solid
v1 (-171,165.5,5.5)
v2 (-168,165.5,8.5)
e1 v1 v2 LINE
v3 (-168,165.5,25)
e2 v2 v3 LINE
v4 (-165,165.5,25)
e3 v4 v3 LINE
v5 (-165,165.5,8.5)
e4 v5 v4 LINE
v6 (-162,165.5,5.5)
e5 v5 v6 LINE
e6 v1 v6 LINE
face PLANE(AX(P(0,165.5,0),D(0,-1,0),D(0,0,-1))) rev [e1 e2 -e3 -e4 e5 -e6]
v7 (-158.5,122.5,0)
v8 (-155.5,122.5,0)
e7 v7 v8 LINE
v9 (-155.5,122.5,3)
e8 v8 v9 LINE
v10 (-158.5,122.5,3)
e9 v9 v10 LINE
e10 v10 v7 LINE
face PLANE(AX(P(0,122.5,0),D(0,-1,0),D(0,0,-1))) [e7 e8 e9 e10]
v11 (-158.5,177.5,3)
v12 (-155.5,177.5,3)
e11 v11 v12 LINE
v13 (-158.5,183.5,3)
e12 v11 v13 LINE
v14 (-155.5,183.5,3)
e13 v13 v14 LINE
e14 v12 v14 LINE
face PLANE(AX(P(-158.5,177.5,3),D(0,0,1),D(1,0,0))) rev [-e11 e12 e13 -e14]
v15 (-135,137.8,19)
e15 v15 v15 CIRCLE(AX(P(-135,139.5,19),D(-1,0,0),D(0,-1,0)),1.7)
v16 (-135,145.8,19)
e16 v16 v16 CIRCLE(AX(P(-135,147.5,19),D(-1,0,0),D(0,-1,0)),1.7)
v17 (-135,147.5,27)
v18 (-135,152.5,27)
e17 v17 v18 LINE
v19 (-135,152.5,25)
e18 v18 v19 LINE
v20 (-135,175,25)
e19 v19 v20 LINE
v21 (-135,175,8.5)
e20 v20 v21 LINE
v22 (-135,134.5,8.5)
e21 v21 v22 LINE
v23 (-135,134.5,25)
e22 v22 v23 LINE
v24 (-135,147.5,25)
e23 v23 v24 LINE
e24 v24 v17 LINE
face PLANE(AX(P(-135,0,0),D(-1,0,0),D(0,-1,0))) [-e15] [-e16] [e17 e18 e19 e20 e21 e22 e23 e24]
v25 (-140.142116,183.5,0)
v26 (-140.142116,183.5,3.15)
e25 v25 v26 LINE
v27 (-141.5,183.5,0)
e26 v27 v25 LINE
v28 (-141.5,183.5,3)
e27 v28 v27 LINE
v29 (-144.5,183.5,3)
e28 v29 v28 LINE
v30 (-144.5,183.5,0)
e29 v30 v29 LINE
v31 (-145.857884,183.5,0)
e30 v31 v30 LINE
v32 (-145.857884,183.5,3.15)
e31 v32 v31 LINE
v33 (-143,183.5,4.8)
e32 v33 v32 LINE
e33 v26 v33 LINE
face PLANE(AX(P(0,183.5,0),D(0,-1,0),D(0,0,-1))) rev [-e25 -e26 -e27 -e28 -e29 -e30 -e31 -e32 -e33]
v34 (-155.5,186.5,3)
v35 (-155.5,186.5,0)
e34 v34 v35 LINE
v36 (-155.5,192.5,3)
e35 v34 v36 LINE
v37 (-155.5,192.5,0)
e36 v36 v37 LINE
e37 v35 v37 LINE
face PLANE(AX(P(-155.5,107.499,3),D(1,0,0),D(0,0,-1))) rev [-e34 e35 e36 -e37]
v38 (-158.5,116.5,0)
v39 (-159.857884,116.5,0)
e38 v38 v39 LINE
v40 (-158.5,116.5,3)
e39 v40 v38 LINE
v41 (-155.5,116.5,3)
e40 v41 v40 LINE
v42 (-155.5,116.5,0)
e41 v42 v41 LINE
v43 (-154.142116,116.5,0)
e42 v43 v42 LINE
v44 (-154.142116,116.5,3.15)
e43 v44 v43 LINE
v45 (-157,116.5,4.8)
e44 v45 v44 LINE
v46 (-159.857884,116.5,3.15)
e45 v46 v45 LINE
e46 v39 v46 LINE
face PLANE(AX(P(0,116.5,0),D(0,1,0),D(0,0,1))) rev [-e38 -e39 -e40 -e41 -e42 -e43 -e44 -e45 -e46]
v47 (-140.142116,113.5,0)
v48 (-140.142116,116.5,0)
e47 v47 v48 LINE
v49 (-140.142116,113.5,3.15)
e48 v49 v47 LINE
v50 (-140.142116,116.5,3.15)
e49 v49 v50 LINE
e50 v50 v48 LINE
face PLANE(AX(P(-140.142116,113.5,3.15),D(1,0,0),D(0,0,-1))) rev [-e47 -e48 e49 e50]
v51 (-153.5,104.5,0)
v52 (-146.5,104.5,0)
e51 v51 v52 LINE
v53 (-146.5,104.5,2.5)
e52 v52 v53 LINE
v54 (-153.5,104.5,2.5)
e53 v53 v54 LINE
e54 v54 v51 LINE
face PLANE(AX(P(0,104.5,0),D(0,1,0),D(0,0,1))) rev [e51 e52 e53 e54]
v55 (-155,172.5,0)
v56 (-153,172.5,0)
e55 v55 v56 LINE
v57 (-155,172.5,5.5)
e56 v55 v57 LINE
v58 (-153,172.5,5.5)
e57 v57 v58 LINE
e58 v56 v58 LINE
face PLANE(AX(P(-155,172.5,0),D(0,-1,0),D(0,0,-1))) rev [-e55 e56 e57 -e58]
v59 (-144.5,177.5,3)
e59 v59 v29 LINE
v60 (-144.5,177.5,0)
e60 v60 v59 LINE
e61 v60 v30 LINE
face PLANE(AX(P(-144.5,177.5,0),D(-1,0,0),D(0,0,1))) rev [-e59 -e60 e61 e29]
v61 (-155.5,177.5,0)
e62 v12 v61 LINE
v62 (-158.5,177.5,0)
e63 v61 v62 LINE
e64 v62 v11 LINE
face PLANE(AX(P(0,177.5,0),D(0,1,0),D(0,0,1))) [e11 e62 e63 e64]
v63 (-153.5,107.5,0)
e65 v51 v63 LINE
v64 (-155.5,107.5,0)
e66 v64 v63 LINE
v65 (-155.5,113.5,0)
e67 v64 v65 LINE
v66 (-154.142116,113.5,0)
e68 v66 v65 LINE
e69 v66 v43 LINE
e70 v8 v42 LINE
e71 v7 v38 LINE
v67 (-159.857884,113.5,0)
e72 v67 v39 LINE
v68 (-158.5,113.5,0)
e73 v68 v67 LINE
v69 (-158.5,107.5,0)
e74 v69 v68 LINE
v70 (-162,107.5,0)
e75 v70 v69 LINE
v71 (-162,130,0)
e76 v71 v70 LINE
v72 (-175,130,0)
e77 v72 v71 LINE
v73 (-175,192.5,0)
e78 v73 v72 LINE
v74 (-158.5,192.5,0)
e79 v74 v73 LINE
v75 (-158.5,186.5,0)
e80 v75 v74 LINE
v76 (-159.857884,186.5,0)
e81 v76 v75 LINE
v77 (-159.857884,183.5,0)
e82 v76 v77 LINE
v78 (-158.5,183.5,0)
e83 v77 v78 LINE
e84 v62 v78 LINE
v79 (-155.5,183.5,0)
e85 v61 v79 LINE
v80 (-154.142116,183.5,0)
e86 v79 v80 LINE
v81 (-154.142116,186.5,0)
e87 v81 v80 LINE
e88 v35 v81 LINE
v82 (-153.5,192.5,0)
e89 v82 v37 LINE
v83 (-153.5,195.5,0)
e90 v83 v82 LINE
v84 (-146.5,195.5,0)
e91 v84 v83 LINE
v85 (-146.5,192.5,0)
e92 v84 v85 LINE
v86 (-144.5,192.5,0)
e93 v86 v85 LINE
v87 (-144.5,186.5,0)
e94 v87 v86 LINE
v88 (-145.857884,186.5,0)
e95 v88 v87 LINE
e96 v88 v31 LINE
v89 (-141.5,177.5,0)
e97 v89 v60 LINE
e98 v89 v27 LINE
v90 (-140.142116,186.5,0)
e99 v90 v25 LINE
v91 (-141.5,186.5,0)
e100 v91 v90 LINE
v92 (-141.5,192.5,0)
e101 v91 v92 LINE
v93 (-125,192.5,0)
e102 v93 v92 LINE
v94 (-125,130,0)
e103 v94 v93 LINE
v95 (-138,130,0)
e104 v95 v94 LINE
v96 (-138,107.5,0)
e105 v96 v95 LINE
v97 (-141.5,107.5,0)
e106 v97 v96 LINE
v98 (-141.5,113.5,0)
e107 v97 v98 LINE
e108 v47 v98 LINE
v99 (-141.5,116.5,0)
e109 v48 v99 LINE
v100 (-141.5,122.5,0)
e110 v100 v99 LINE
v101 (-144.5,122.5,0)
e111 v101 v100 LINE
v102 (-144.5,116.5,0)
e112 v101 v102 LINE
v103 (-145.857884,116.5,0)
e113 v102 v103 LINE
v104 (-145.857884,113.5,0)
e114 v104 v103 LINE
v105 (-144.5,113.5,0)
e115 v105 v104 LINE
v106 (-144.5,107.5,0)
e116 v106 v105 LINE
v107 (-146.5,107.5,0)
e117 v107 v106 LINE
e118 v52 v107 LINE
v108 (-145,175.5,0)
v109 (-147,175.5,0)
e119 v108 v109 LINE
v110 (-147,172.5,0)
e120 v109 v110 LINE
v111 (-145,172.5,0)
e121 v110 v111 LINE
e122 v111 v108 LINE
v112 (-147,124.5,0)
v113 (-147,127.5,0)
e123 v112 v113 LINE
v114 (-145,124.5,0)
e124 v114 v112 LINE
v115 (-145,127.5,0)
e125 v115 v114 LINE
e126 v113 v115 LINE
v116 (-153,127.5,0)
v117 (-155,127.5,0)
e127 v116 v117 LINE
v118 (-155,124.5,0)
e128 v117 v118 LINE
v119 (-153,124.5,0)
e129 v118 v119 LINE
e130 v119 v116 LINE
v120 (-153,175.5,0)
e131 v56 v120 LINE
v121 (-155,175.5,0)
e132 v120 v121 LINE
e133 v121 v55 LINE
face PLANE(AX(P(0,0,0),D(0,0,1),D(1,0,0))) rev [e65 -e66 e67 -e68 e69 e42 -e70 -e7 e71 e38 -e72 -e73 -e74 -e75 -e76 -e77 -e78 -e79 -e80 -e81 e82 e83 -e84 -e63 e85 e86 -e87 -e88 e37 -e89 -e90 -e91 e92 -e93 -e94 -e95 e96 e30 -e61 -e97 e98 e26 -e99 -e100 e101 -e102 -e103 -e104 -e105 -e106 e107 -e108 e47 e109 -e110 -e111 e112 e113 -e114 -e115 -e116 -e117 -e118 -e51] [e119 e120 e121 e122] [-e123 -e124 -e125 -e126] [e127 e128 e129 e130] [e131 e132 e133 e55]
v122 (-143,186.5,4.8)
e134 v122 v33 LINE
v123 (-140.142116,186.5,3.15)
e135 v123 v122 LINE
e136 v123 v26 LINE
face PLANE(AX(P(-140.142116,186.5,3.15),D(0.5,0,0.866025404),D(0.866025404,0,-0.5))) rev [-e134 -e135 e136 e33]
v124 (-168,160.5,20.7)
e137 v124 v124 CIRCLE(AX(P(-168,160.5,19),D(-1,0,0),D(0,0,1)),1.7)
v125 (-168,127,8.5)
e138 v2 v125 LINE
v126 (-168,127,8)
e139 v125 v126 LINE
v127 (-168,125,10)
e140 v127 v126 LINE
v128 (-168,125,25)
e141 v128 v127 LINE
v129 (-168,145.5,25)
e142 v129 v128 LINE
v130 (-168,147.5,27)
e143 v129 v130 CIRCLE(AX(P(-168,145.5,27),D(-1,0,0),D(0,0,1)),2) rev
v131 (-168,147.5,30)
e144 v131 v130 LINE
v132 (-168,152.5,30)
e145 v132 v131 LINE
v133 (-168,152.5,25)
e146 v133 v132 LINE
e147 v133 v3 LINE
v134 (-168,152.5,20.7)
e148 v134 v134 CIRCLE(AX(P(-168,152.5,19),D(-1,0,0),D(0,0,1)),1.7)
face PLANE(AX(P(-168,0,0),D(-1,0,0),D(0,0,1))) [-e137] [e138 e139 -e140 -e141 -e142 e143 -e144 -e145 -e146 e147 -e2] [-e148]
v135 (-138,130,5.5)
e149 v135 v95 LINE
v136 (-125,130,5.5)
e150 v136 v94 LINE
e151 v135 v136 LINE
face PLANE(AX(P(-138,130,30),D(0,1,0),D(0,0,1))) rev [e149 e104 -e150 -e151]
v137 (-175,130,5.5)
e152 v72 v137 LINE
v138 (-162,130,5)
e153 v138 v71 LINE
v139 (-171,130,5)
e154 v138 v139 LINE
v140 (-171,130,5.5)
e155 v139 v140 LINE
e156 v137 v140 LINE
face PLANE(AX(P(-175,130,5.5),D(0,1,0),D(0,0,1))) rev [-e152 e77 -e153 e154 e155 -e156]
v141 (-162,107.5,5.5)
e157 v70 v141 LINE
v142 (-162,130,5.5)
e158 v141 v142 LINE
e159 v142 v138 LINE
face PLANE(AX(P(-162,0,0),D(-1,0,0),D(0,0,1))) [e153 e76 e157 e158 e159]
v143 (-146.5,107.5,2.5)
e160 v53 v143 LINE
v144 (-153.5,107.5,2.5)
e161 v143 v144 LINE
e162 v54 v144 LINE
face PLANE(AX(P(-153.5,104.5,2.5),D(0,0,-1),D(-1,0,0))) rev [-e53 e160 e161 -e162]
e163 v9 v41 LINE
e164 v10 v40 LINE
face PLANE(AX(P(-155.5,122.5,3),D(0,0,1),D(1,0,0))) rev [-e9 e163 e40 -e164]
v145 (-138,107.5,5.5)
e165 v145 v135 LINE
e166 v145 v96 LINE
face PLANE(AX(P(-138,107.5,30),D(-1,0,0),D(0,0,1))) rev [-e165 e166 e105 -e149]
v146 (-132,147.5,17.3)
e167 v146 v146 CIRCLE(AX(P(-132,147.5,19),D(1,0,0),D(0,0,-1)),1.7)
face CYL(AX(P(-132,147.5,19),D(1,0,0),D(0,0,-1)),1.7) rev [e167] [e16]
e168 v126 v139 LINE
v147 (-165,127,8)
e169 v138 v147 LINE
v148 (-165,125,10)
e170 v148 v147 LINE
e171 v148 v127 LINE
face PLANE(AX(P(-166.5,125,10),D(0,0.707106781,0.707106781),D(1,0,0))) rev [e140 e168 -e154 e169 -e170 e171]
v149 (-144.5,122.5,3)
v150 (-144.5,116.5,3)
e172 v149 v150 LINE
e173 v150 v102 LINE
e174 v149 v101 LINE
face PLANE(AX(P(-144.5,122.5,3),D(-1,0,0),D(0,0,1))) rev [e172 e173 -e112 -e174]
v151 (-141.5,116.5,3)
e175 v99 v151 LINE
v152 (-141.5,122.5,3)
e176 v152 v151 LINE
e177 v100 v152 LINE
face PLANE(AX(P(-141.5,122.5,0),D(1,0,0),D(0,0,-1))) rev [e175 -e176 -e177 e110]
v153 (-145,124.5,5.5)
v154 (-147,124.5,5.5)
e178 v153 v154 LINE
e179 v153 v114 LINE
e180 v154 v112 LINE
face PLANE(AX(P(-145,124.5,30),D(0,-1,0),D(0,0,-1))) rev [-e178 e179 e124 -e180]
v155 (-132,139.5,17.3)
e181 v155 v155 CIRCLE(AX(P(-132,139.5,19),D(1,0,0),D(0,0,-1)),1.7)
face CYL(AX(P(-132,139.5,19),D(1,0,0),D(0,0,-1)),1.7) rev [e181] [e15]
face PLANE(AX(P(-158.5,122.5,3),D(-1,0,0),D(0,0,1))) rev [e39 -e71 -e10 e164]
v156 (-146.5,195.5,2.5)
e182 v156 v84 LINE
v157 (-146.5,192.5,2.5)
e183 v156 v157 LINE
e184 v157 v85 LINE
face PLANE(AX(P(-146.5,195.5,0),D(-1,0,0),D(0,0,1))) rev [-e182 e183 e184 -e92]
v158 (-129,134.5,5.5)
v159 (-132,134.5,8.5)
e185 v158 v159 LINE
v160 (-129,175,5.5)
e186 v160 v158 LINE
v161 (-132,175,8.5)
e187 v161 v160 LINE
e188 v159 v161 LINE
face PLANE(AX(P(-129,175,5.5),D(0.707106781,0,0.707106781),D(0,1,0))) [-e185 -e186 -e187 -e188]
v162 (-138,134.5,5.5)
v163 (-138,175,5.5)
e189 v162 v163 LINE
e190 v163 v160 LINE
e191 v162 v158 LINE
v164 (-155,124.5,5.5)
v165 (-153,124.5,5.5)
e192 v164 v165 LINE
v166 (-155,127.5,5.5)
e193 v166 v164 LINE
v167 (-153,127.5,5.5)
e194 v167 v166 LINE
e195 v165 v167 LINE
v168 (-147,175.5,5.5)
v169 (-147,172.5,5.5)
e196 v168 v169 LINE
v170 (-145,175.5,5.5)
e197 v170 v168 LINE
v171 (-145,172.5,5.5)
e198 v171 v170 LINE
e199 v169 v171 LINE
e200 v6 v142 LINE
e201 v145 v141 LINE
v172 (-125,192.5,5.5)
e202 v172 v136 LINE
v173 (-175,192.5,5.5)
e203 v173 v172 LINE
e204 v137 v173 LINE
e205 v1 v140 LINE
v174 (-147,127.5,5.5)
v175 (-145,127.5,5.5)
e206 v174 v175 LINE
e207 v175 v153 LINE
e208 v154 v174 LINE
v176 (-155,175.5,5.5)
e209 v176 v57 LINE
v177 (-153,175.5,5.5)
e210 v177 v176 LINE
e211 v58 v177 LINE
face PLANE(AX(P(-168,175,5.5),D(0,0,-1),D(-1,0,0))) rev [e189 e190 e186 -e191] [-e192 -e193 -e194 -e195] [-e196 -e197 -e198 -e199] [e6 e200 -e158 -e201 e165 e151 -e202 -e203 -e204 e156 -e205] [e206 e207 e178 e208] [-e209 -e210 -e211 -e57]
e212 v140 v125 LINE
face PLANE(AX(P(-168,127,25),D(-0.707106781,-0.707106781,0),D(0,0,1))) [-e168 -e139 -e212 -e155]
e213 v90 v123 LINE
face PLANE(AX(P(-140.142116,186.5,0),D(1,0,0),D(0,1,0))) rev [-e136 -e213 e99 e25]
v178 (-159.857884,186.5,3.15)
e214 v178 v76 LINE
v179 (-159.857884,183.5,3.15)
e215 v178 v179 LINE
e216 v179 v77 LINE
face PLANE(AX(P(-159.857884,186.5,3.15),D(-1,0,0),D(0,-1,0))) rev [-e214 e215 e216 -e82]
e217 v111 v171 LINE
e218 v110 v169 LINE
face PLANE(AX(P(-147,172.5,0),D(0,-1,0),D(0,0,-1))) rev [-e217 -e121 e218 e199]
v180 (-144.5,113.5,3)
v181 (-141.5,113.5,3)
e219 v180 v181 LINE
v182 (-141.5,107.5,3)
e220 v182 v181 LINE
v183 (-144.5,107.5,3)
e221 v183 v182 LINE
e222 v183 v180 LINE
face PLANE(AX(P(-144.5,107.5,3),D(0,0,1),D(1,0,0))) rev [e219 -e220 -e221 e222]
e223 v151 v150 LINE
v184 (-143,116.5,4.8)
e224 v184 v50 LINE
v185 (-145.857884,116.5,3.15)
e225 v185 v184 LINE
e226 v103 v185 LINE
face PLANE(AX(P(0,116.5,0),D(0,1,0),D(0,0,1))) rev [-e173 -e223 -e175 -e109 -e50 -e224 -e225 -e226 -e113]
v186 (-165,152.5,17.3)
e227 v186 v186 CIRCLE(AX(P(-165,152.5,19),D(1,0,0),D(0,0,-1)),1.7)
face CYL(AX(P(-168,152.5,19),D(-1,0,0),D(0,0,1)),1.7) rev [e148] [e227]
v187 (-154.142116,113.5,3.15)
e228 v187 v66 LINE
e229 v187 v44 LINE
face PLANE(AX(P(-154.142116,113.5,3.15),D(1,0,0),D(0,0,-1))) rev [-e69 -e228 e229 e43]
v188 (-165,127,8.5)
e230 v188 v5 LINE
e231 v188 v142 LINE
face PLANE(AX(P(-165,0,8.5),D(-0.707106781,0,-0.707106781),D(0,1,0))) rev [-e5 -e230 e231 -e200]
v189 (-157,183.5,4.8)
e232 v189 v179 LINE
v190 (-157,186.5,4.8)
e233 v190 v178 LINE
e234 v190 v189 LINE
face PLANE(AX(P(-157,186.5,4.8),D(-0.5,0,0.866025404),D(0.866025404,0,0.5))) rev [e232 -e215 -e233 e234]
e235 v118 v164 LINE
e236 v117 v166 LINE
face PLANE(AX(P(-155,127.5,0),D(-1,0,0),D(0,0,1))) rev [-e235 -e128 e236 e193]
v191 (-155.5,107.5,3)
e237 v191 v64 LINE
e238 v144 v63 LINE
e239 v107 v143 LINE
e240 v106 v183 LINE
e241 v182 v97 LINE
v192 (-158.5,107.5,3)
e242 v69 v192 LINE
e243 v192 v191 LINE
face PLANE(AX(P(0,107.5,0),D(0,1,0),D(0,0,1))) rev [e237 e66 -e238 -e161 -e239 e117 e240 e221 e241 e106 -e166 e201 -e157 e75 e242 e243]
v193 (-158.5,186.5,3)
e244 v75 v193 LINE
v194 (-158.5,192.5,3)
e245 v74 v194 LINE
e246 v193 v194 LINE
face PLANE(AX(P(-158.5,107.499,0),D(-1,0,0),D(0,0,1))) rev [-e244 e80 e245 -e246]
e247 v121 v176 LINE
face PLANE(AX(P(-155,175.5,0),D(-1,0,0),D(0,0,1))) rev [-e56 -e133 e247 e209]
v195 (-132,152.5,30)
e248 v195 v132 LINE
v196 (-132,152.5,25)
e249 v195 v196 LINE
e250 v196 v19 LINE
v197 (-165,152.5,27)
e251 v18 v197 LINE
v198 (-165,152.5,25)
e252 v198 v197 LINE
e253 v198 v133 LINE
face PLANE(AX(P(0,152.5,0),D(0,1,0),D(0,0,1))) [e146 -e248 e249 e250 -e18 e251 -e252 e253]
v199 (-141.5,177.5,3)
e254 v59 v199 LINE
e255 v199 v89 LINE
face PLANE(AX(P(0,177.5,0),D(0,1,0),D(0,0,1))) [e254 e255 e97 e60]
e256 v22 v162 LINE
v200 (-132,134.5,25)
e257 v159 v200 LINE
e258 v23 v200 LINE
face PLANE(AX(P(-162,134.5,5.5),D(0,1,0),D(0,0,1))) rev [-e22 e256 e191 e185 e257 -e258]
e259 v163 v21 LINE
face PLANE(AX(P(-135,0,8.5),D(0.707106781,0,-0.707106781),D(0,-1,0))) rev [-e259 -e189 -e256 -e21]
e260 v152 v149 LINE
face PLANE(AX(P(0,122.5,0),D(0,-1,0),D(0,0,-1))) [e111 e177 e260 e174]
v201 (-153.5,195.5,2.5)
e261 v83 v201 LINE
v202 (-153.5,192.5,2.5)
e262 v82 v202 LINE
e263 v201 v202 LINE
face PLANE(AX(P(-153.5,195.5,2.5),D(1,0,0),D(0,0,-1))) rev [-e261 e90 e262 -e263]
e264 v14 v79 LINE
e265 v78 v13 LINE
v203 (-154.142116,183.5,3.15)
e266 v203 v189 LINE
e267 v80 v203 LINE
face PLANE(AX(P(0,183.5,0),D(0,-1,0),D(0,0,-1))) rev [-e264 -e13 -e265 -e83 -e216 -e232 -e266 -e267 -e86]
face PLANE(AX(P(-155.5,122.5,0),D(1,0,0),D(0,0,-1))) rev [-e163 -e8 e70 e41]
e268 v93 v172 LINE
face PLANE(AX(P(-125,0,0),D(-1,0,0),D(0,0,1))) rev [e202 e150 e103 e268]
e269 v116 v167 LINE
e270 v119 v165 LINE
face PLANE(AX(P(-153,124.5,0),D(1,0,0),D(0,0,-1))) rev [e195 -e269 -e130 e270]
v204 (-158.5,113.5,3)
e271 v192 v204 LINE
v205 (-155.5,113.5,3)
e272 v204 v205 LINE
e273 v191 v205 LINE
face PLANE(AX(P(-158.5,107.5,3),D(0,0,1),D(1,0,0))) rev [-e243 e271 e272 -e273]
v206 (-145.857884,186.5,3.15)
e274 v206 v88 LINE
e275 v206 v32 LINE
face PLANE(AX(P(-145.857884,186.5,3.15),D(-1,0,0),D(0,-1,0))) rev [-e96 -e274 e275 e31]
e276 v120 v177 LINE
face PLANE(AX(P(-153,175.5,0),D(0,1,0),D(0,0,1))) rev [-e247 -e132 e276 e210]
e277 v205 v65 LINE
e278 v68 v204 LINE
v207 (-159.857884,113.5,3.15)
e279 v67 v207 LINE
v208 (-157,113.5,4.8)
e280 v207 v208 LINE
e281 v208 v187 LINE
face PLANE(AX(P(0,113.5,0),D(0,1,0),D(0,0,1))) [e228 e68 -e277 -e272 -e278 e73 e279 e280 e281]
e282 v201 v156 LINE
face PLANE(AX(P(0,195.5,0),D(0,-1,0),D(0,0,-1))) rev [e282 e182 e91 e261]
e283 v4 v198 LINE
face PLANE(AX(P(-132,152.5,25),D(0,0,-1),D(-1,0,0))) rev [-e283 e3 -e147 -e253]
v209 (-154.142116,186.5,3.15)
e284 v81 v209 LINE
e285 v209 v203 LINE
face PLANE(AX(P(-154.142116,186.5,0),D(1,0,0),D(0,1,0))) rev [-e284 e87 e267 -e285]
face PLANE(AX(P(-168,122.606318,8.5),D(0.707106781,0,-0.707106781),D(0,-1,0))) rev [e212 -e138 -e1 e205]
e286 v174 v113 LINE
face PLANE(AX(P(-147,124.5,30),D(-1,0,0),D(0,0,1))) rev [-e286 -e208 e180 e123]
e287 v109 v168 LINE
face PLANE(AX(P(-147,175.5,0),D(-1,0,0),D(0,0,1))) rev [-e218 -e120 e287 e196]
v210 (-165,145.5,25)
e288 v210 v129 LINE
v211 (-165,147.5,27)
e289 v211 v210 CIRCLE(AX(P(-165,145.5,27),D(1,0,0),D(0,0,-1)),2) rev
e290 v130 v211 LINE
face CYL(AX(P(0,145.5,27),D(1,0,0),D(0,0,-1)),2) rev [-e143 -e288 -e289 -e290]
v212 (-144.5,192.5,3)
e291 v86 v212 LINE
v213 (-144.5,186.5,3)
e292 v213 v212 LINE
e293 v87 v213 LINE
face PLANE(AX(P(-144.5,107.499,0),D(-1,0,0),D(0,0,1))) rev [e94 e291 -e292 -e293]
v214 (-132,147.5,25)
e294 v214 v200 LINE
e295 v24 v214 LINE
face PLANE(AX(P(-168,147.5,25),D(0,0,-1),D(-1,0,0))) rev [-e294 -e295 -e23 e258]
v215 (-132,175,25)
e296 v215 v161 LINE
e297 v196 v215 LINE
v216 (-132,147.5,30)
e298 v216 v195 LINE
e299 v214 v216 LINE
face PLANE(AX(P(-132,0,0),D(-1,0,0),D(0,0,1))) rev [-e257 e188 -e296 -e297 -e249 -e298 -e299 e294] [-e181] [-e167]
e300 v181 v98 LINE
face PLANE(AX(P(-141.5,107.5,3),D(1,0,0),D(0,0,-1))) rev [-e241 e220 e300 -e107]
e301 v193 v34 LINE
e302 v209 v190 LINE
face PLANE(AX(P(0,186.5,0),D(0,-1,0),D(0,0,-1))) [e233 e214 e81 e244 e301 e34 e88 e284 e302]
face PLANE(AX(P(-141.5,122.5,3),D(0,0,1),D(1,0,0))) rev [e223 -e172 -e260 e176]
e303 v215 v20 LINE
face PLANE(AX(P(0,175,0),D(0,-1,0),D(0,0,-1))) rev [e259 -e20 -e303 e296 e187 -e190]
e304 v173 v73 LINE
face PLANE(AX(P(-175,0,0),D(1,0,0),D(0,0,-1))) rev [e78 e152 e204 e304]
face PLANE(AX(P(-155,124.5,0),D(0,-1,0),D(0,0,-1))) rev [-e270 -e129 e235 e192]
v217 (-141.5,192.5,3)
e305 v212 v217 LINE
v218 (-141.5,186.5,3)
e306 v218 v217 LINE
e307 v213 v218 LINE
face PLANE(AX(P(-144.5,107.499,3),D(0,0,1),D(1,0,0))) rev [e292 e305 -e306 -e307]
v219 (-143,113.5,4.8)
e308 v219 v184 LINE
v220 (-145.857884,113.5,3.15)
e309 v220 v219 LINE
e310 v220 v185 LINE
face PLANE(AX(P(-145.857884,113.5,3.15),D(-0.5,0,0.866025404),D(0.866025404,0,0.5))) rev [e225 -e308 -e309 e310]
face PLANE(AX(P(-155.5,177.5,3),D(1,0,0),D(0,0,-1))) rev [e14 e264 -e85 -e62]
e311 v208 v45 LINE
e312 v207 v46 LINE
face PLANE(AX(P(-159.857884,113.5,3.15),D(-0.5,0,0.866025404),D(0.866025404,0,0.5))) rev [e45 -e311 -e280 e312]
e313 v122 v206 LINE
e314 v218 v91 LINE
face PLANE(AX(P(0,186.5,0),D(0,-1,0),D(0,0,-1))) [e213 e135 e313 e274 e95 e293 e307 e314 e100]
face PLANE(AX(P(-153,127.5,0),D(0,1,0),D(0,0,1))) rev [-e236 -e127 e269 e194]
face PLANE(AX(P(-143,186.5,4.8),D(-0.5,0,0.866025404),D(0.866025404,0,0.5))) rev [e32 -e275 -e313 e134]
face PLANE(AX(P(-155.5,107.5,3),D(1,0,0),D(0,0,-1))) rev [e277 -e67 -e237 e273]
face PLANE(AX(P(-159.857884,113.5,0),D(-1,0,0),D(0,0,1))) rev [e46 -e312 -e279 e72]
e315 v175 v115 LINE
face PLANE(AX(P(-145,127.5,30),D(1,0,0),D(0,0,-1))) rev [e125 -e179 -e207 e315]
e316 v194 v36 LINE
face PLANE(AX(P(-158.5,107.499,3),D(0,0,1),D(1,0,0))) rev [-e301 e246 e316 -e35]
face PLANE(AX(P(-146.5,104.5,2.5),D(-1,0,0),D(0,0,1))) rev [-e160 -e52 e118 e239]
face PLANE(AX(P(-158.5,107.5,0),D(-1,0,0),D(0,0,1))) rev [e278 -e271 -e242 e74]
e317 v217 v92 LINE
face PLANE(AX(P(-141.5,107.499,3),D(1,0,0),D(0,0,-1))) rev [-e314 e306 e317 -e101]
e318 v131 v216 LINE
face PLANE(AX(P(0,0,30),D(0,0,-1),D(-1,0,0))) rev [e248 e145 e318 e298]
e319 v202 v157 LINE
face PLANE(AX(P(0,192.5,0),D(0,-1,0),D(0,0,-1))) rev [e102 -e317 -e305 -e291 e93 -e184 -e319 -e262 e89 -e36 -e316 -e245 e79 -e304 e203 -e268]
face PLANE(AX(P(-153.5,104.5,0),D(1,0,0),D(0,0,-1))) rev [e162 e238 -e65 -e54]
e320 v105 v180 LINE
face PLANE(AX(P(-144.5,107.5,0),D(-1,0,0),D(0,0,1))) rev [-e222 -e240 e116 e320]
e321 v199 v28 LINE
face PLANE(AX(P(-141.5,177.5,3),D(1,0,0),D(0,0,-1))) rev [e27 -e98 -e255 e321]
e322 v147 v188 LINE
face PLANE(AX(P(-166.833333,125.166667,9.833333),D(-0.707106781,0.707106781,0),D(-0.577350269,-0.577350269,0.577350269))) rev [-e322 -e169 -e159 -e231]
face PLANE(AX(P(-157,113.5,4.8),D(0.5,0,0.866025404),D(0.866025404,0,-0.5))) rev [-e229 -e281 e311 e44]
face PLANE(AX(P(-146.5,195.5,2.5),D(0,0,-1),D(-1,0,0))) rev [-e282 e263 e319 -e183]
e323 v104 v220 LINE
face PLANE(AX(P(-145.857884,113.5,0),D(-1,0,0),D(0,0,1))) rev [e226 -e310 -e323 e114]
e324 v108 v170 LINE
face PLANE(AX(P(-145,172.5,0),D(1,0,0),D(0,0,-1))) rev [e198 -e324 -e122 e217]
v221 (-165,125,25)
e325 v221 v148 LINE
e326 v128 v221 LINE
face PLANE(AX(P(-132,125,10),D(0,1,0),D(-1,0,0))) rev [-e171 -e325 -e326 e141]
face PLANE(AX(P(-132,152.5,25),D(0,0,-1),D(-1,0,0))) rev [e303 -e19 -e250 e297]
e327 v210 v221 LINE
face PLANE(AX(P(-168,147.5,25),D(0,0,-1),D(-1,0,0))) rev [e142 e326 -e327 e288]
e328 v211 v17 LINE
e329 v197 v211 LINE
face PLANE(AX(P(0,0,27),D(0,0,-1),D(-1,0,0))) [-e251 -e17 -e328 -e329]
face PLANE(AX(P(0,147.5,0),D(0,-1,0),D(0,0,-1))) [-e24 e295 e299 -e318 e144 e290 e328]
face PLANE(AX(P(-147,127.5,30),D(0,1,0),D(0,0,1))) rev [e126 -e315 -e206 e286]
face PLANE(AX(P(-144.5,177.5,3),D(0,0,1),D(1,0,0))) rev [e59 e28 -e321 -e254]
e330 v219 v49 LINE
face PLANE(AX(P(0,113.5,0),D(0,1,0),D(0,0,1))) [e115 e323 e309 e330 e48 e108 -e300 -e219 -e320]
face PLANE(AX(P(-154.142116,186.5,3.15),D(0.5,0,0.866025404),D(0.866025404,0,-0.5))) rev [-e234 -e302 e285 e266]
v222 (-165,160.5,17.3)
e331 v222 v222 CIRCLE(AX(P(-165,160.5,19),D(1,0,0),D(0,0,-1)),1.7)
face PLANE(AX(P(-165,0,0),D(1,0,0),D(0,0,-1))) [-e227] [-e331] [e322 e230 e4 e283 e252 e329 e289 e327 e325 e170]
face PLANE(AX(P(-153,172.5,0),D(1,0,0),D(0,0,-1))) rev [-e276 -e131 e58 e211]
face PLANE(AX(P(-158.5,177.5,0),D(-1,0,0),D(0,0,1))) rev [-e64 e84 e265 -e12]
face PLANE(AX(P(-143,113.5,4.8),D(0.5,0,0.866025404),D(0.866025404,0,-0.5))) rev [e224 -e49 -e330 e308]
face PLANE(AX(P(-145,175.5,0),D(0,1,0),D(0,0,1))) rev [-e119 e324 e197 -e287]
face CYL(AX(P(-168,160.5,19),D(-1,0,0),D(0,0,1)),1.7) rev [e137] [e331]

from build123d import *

# Parameters (mm, degrees)
CUT_EXTRUDE_START           = -3
CUT_EXTRUDE_1_DEPTH         = 0.5
CUT_EXTRUDE_START_2         = 127
CUT_EXTRUDE_1_2_DEPTH       = 3
CUT_EXTRUDE_START_3         = -172
CUT_EXTRUDE_1_3_DEPTH       = 8
SKETCH_2_W                  = 2.5
SKETCH_2_H                  = 0.5
EXTRUDE_1_DEPTH             = 0.5
SKETCH_3_W                  = 2.5
SKETCH_3_H                  = 0.5
EXTRUDE_2_DEPTH             = 5
EXTRUDE_3_DEPTH             = 0.5
EXTRUDE_4_DEPTH             = 36
EXTRUDE_5_DEPTH             = 35.5
EXTRUDE_6_DEPTH             = 9.5
SKETCH_8_W                  = 39
SKETCH_8_H                  = 5.5
EXTRUDE_7_DEPTH             = 17.5
SKETCH_9_W                  = 36
SKETCH_9_H                  = 2
CUT_EXTRUDE_2_DEPTH         = 22.5
SKETCH_10_W                 = 36
SKETCH_10_H                 = 2
CUT_EXTRUDE_3_DEPTH         = 22.5
SKETCH_11_W                 = 39
SKETCH_11_H                 = 5.5
EXTRUDE_8_DEPTH             = 22
SKETCH_12_W                 = 5.5
SKETCH_12_H                 = 62.5
EXTRUDE_9_DEPTH             = 4
CUT_EXTRUDE_4_DEPTH         = 9
SKETCH_14_W                 = 5.5
SKETCH_14_H                 = 85
EXTRUDE_10_DEPTH            = 7
CUT_EXTRUDE_5_DEPTH         = 30
SKETCH_16_W                 = 19.5
SKETCH_16_H                 = 9.5
CUT_EXTRUDE_6_DEPTH         = 6
CUT_EXTRUDE_7_DEPTH         = 27
CUT_EXTRUDE_8_DEPTH         = 3
SKETCH_19_W                 = 36
SKETCH_19_H                 = 5
EXTRUDE_11_DEPTH            = 3
CUT_EXTRUDE_9_DEPTH         = 3
SKETCH_21_W                 = 3
SKETCH_21_H                 = 3
CUT_EXTRUDE_10_DEPTH        = 195.334762716
CUT_EXTRUDE_11_DEPTH        = 3
SKETCH_23_W                 = 3
SKETCH_23_H                 = 3
CUT_EXTRUDE_12_DEPTH        = 195.334762716
CUT_EXTRUDE_13_DEPTH        = 3
CUT_EXTRUDE_14_REACH        = 198.85
SKETCH_25_W                 = 3
SKETCH_25_H                 = 3
CUT_EXTRUDE_15_DEPTH        = 3
CUT_EXTRUDE_16_REACH        = 198.85
SKETCH_27_W                 = 3
SKETCH_27_H                 = 3
SKETCH_28_W                 = 13
SKETCH_28_H                 = 22.5
CUT_EXTRUDE_17_DEPTH        = 262.880220712
SKETCH_29_W                 = 2
SKETCH_29_H                 = 3
CUT_EXTRUDE_18_DEPTH        = 262.307290369
SKETCH_30_W                 = 2
SKETCH_30_H                 = 3
CUT_EXTRUDE_19_DEPTH        = 262.307290369
SKETCH_31_W                 = 2
SKETCH_31_H                 = 3
CUT_EXTRUDE_20_DEPTH        = 262.307290369
SKETCH_32_W                 = 2
SKETCH_32_H                 = 3
CUT_EXTRUDE_21_DEPTH        = 262.880220712
SKETCH_33_W                 = 7
SKETCH_33_H                 = 2.5
EXTRUDE_12_DEPTH            = 3
SKETCH_34_W                 = 7
SKETCH_34_H                 = 2.5
EXTRUDE_13_DEPTH            = 3
SKETCH_35_W                 = 3
SKETCH_35_H                 = 3
CUT_EXTRUDE_22_DEPTH        = 6
SKETCH_36_W                 = 3
SKETCH_36_H                 = 3
CUT_EXTRUDE_23_DEPTH        = 6
SKETCH_37_W                 = 3
SKETCH_37_H                 = 3
CUT_EXTRUDE_24_DEPTH        = 6
SKETCH_38_W                 = 3
SKETCH_38_H                 = 3
CUT_EXTRUDE_25_DEPTH        = 6
HOLE_WIZARD_3_4_3_4_1_D     = 3.4
HOLE_WIZARD_3_4_3_4_1_DEPTH = 3
HOLE_WIZARD_3_4_3_4_2_D     = 3.4
HOLE_WIZARD_3_4_3_4_2_DEPTH = 3
CHAMFER_1_SIZE              = 3
CHAMFER_2_SIZE              = 0.40824829
FILLET_2_R                  = 2


with BuildPart() as part:
    # 切除-拉伸1: read off the stored shape, not the designer's step
    # 切除-拉伸1 outline → 切除-拉伸1 (new body)
    with BuildSketch(Plane(origin=(-168, 0, 0), x_dir=(0, 0, -1), z_dir=(1, 0, 0)).offset(CUT_EXTRUDE_START)):
        Polygon((-5, 130), (-5.5, 130), (-5.5, 129.5), align=None)
    extrude(amount=CUT_EXTRUDE_1_DEPTH)

    # Cut-Extrude 1 2 outline → Cut-Extrude 1 2 (add)
    with BuildSketch(Plane(origin=(0, 0, 0), x_dir=(1, 0, 0), z_dir=(0, 1, 0)).offset(CUT_EXTRUDE_START_2)):
        Polygon((-171, -5.5), (-168, -8.5), (-168, -5.5), align=None)
    extrude(amount=CUT_EXTRUDE_1_2_DEPTH)

    # Cut-Extrude 1 3 outline → Cut-Extrude 1 3 (cut)
    with BuildSketch(Plane(origin=(0, 0, 0), x_dir=(0.8164965809277257, 0.4082482904638635, -0.4082482904638629), z_dir=(0.5773502691896261, -0.5773502691896261, 0.5773502691896253)).offset(CUT_EXTRUDE_START_3)):
        Polygon((-85, 95.45941546), (-88.589879031, 95.45941546), (-88.794003176, 95.812968851), (-90.018748047, 93.691648507), (-90.995421768, 92), (-85, 92), align=None)
    extrude(amount=CUT_EXTRUDE_1_3_DEPTH, mode=Mode.SUBTRACT)

    # 草图2 → 凸台-拉伸1 (add)
    with BuildSketch(Plane(origin=(0, 0, 5.5), x_dir=(-1, 0, 0), z_dir=(0, 0, -1))):
        with Locations((169.25, 129.75)):
            Rectangle(SKETCH_2_W, SKETCH_2_H)
    extrude(amount=EXTRUDE_1_DEPTH)

    # 草图3 → 凸台-拉伸2 (add)
    with BuildSketch(Plane(origin=(0, 0, 5), x_dir=(-1, 0, 0), z_dir=(0, 0, -1))):
        with Locations((169.25, 129.75)):
            Rectangle(SKETCH_3_W, SKETCH_3_H)
    extrude(amount=EXTRUDE_2_DEPTH)

    # 草图4 → 凸台-拉伸3 (add)
    with BuildSketch(Plane.ZY.offset(170.5)):
        Polygon((0, 130), (5, 130), (5.5, 129.5), (0, 129.5), align=None)
    extrude(amount=EXTRUDE_3_DEPTH)

    # 草图5 → 凸台-拉伸4 (add)
    with BuildSketch(Plane(origin=(-168, 0, 0), x_dir=(0, 0, -1), z_dir=(1, 0, 0))):
        Polygon((0, 130), (0, 129.5), (-5.5, 129.5), (-10, 125), (-27, 125), (-27, 130), align=None)
    extrude(amount=EXTRUDE_4_DEPTH)

    # 草图6 → 凸台-拉伸5 (add)
    with BuildSketch(Plane(origin=(0, 130, 0), x_dir=(-1, 0, 0), z_dir=(0, 1, 0))):
        Polygon((168, 8.5), (171, 5.5), (171, 0), (132, 0), (132, 27), (168, 27), align=None)
    extrude(amount=EXTRUDE_5_DEPTH)

    # 草图7 → 凸台-拉伸6 (add)
    with BuildSketch(Plane(origin=(0, 165.5, 0), x_dir=(-1, 0, 0), z_dir=(0, 1, 0))):
        Polygon((132, 0), (132, 27), (168, 27), (168, 5.5), (171, 5.5), (171, 0), align=None)
    extrude(amount=EXTRUDE_6_DEPTH)

    # 草图8 → 凸台-拉伸7 (add)
    with BuildSketch(Plane(origin=(0, 175, 0), x_dir=(-1, 0, 0), z_dir=(0, 1, 0))):
        with Locations((151.5, 2.75)):
            Rectangle(SKETCH_8_W, SKETCH_8_H)
    extrude(amount=EXTRUDE_7_DEPTH)

    # 草图9 → 切除-拉伸2 (cut)
    with BuildSketch(Plane.XZ.offset(-125)):
        with Locations((-150, 26)):
            Rectangle(SKETCH_9_W, SKETCH_9_H)
    extrude(amount=-CUT_EXTRUDE_2_DEPTH, mode=Mode.SUBTRACT)

    # 草图10 → 切除-拉伸3 (cut)
    with BuildSketch(Plane(origin=(0, 175, 0), x_dir=(-1, 0, 0), z_dir=(0, 1, 0))):
        with Locations((150, 26)):
            Rectangle(SKETCH_10_W, SKETCH_10_H)
    extrude(amount=-CUT_EXTRUDE_3_DEPTH, mode=Mode.SUBTRACT)

    # 草图11 → 凸台-拉伸8 (add)
    with BuildSketch(Plane.XZ.offset(-129.5)):
        with Locations((-151.5, 2.75)):
            Rectangle(SKETCH_11_W, SKETCH_11_H)
    extrude(amount=EXTRUDE_8_DEPTH)

    # 草图12 → 凸台-拉伸9 (add)
    with BuildSketch(Plane.ZY.offset(171)):
        with Locations((2.75, 161.25)):
            Rectangle(SKETCH_12_W, SKETCH_12_H)
    extrude(amount=EXTRUDE_9_DEPTH)

    # 草图13 → 切除-拉伸4 (cut)
    with BuildSketch(Plane.ZY.offset(171)):
        Polygon((0, 130), (0, 107.5), (5.5, 107.5), (5.5, 129.5), (5, 130), align=None)
    extrude(amount=-CUT_EXTRUDE_4_DEPTH, mode=Mode.SUBTRACT)

    # 草图14 → 凸台-拉伸10 (add)
    with BuildSketch(Plane(origin=(-132, 0, 0), x_dir=(0, 0, -1), z_dir=(1, 0, 0))):
        with Locations((-2.75, 150)):
            Rectangle(SKETCH_14_W, SKETCH_14_H)
    extrude(amount=EXTRUDE_10_DEPTH)

    # 草图15 → 切除-拉伸5 (cut)
    with BuildSketch(Plane(origin=(-132, 0, 0), x_dir=(0, 0, -1), z_dir=(1, 0, 0))):
        Polygon((-5.5, 134.5), (-25, 134.5), (-25, 125), (-10, 125), (-5.5, 129.5), align=None)
    extrude(amount=-CUT_EXTRUDE_5_DEPTH, mode=Mode.SUBTRACT)

    # 草图16 → 切除-拉伸6 (cut)
    with BuildSketch(Plane.ZY.offset(168)):
        with Locations((15.25, 170.25)):
            Rectangle(SKETCH_16_W, SKETCH_16_H)
    extrude(amount=-CUT_EXTRUDE_6_DEPTH, mode=Mode.SUBTRACT)

    # 草图17 → 切除-拉伸7 (cut)
    with BuildSketch(Plane.ZY.offset(162)):
        Polygon((25, 134.5), (25, 147.5), (27, 147.5), (27, 152.5), (25, 152.5), (25, 175), (5.5, 175), (5.5, 134.5), align=None)
    extrude(amount=-CUT_EXTRUDE_7_DEPTH, mode=Mode.SUBTRACT)

    # 草图18 → 切除-拉伸8 (cut)
    with BuildSketch(Plane(origin=(-162, 0, 0), x_dir=(0, 0, -1), z_dir=(1, 0, 0))):
        Polygon((-10, 125), (-5.5, 129.5), (-5.5, 165.5), (-25, 165.5), (-25, 152.5), (-27, 152.5), (-27, 147.5), (-25, 147.5), (-25, 125), align=None)
    extrude(amount=-CUT_EXTRUDE_8_DEPTH, mode=Mode.SUBTRACT)

    # 草图19 → 凸台-拉伸11 (add)
    with BuildSketch(Plane.XY.offset(27)):
        with Locations((-150, 150)):
            Rectangle(SKETCH_19_W, SKETCH_19_H)
    extrude(amount=EXTRUDE_11_DEPTH)

    # 草图20 → 切除-拉伸9 (cut)
    with BuildSketch(Plane(origin=(0, 116.5, 0), x_dir=(1, 0, 0), z_dir=(0, 1, 0))):
        Polygon((-145.857883832, 0), (-145.857883832, -3.15), (-143, -4.8), (-140.142116168, -3.15), (-140.142116168, 0), align=None)
    extrude(amount=-CUT_EXTRUDE_9_DEPTH, mode=Mode.SUBTRACT)

    # 草图21 → 切除-拉伸10 (cut, through all)
    with BuildSketch(Plane(origin=(0, 113.5, 0), x_dir=(-1, 0, 0), z_dir=(0, 1, 0))):
        with Locations((143, 1.5)):
            Rectangle(SKETCH_21_W, SKETCH_21_H)
    extrude(amount=-CUT_EXTRUDE_10_DEPTH, mode=Mode.SUBTRACT)

    # 草图22 → 切除-拉伸11 (cut)
    with BuildSketch(Plane(origin=(0, 116.5, 0), x_dir=(1, 0, 0), z_dir=(0, 1, 0))):
        Polygon((-159.857883832, 0), (-159.857883832, -3.15), (-157, -4.8), (-154.142116168, -3.15), (-154.142116168, 0), align=None)
    extrude(amount=-CUT_EXTRUDE_11_DEPTH, mode=Mode.SUBTRACT)

    # 草图23 → 切除-拉伸12 (cut, through all)
    with BuildSketch(Plane(origin=(0, 113.5, 0), x_dir=(-1, 0, 0), z_dir=(0, 1, 0))):
        with Locations((157, 1.5)):
            Rectangle(SKETCH_23_W, SKETCH_23_H)
    extrude(amount=-CUT_EXTRUDE_12_DEPTH, mode=Mode.SUBTRACT)

    # 草图24 → 切除-拉伸13 (cut)
    with BuildSketch(Plane.XZ.offset(-183.5)):
        Polygon((-145.857883832, 0), (-140.142116168, 0), (-140.142116168, 3.15), (-143, 4.8), (-145.857883832, 3.15), align=None)
    extrude(amount=-CUT_EXTRUDE_13_DEPTH, mode=Mode.SUBTRACT)

    # 草图25 → 切除-拉伸14 (cut, up to next)
    with BuildSketch(Plane(origin=(0, 192.5, 0), x_dir=(-1, 0, 0), z_dir=(0, 1, 0)), mode=Mode.PRIVATE) as cut_extrude_14_sk1:
        with Locations((143, 1.5)):
            Rectangle(SKETCH_25_W, SKETCH_25_H)
    cut_extrude_14_tool1 = extrude(cut_extrude_14_sk1.sketch, amount=-CUT_EXTRUDE_14_REACH, mode=Mode.PRIVATE) & part.part
    add(cut_extrude_14_tool1.solids().sort_by_distance((-143, 192.5, 1.5))[0], mode=Mode.SUBTRACT)

    # 草图26 → 切除-拉伸15 (cut)
    with BuildSketch(Plane.XZ.offset(-183.5)):
        Polygon((-159.857883832, 0), (-154.142116168, 0), (-154.142116168, 3.15), (-157, 4.8), (-159.857883832, 3.15), align=None)
    extrude(amount=-CUT_EXTRUDE_15_DEPTH, mode=Mode.SUBTRACT)

    # 草图27 → 切除-拉伸16 (cut, up to next)
    with BuildSketch(Plane(origin=(0, 192.5, 0), x_dir=(-1, 0, 0), z_dir=(0, 1, 0)), mode=Mode.PRIVATE) as cut_extrude_16_sk1:
        with Locations((157, 1.5)):
            Rectangle(SKETCH_27_W, SKETCH_27_H)
    cut_extrude_16_tool1 = extrude(cut_extrude_16_sk1.sketch, amount=-CUT_EXTRUDE_16_REACH, mode=Mode.PRIVATE) & part.part
    add(cut_extrude_16_tool1.solids().sort_by_distance((-157, 192.5, 1.5))[0], mode=Mode.SUBTRACT)

    # 草图28 → 切除-拉伸17 (cut, through all)
    with BuildSketch(Plane(origin=(0, 0, 0), x_dir=(-1, 0, 0), z_dir=(0, 0, -1))):
        with Locations((131.5, 118.75)):
            Rectangle(SKETCH_28_W, SKETCH_28_H)
    extrude(amount=-CUT_EXTRUDE_17_DEPTH, mode=Mode.SUBTRACT)

    # 草图29 → 切除-拉伸18 (cut, through all)
    with BuildSketch(Plane.XY.offset(5.5)):
        with Locations((-154, 174)):
            Rectangle(SKETCH_29_W, SKETCH_29_H)
    extrude(amount=-CUT_EXTRUDE_18_DEPTH, mode=Mode.SUBTRACT)

    # 草图30 → 切除-拉伸19 (cut, through all)
    with BuildSketch(Plane.XY.offset(5.5)):
        with Locations((-146, 174)):
            Rectangle(SKETCH_30_W, SKETCH_30_H)
    extrude(amount=-CUT_EXTRUDE_19_DEPTH, mode=Mode.SUBTRACT)

    # 草图31 → 切除-拉伸20 (cut, through all)
    with BuildSketch(Plane.XY.offset(5.5)):
        with Locations((-154, 126)):
            Rectangle(SKETCH_31_W, SKETCH_31_H)
    extrude(amount=-CUT_EXTRUDE_20_DEPTH, mode=Mode.SUBTRACT)

    # 草图32 → 切除-拉伸21 (cut, through all)
    with BuildSketch(Plane(origin=(0, 0, 0), x_dir=(-1, 0, 0), z_dir=(0, 0, -1))):
        with Locations((146, 126)):
            Rectangle(SKETCH_32_W, SKETCH_32_H)
    extrude(amount=-CUT_EXTRUDE_21_DEPTH, mode=Mode.SUBTRACT)

    # 草图33 → 凸台-拉伸12 (add)
    with BuildSketch(Plane.XZ.offset(-107.5)):
        with Locations((-150, 1.25)):
            Rectangle(SKETCH_33_W, SKETCH_33_H)
    extrude(amount=EXTRUDE_12_DEPTH)

    # 草图34 → 凸台-拉伸13 (add)
    with BuildSketch(Plane(origin=(0, 192.5, 0), x_dir=(-1, 0, 0), z_dir=(0, 1, 0))):
        with Locations((150, 1.25)):
            Rectangle(SKETCH_34_W, SKETCH_34_H)
    extrude(amount=EXTRUDE_13_DEPTH)

    # 草图35 → 切除-拉伸22 (cut)
    with BuildSketch(Plane.XZ.offset(-116.5)):
        with Locations((-143, 1.5)):
            Rectangle(SKETCH_35_W, SKETCH_35_H)
    extrude(amount=-CUT_EXTRUDE_22_DEPTH, mode=Mode.SUBTRACT)

    # 草图36 → 切除-拉伸23 (cut)
    with BuildSketch(Plane.XZ.offset(-116.5)):
        with Locations((-157, 1.5)):
            Rectangle(SKETCH_36_W, SKETCH_36_H)
    extrude(amount=-CUT_EXTRUDE_23_DEPTH, mode=Mode.SUBTRACT)

    # 草图37 → 切除-拉伸24 (cut)
    with BuildSketch(Plane(origin=(0, 183.5, 0), x_dir=(-1, 0, 0), z_dir=(0, 1, 0))):
        with Locations((143, 1.5)):
            Rectangle(SKETCH_37_W, SKETCH_37_H)
    extrude(amount=-CUT_EXTRUDE_24_DEPTH, mode=Mode.SUBTRACT)

    # 草图38 → 切除-拉伸25 (cut)
    with BuildSketch(Plane(origin=(0, 183.5, 0), x_dir=(-1, 0, 0), z_dir=(0, 1, 0))):
        with Locations((157, 1.5)):
            Rectangle(SKETCH_38_W, SKETCH_38_H)
    extrude(amount=-CUT_EXTRUDE_25_DEPTH, mode=Mode.SUBTRACT)

    # Ø3.4 (3.4) 直径孔1
    with Locations(Plane.ZY.offset(168)):
        with Locations((19, 152.5), (19, 160.5)):
            Hole(HOLE_WIZARD_3_4_3_4_1_D / 2, depth=HOLE_WIZARD_3_4_3_4_1_DEPTH)

    # Ø3.4 (3.4) 直径孔2
    with Locations(Plane(origin=(-132, 0, 0), x_dir=(0, 0, -1), z_dir=(1, 0, 0))):
        with Locations((-19, 147.5), (-19, 139.5)):
            Hole(HOLE_WIZARD_3_4_3_4_2_D / 2, depth=HOLE_WIZARD_3_4_3_4_2_DEPTH)

    # 倒角1
    chamfer_1_edges = [part.edges().sort_by_distance(p)[0] for p in [
        (-135, 154.75, 5.5),
        (-132, 154.75, 5.5),
        (-165, 147.5, 5.5),
    ]]
    chamfer(chamfer_1_edges, length=CHAMFER_1_SIZE)

    # 倒角2
    chamfer_2_edges = [part.edges().sort_by_distance(p)[0] for p in [
        (-163.5, 128, 7),
    ]]
    chamfer(chamfer_2_edges, length=CHAMFER_2_SIZE)

    # 圆角2
    fillet_2_edges = [part.edges().sort_by_distance(p)[0] for p in [
        (-166.5, 147.5, 25),
    ]]
    fillet(fillet_2_edges, radius=FILLET_2_R)


solid = part.part
